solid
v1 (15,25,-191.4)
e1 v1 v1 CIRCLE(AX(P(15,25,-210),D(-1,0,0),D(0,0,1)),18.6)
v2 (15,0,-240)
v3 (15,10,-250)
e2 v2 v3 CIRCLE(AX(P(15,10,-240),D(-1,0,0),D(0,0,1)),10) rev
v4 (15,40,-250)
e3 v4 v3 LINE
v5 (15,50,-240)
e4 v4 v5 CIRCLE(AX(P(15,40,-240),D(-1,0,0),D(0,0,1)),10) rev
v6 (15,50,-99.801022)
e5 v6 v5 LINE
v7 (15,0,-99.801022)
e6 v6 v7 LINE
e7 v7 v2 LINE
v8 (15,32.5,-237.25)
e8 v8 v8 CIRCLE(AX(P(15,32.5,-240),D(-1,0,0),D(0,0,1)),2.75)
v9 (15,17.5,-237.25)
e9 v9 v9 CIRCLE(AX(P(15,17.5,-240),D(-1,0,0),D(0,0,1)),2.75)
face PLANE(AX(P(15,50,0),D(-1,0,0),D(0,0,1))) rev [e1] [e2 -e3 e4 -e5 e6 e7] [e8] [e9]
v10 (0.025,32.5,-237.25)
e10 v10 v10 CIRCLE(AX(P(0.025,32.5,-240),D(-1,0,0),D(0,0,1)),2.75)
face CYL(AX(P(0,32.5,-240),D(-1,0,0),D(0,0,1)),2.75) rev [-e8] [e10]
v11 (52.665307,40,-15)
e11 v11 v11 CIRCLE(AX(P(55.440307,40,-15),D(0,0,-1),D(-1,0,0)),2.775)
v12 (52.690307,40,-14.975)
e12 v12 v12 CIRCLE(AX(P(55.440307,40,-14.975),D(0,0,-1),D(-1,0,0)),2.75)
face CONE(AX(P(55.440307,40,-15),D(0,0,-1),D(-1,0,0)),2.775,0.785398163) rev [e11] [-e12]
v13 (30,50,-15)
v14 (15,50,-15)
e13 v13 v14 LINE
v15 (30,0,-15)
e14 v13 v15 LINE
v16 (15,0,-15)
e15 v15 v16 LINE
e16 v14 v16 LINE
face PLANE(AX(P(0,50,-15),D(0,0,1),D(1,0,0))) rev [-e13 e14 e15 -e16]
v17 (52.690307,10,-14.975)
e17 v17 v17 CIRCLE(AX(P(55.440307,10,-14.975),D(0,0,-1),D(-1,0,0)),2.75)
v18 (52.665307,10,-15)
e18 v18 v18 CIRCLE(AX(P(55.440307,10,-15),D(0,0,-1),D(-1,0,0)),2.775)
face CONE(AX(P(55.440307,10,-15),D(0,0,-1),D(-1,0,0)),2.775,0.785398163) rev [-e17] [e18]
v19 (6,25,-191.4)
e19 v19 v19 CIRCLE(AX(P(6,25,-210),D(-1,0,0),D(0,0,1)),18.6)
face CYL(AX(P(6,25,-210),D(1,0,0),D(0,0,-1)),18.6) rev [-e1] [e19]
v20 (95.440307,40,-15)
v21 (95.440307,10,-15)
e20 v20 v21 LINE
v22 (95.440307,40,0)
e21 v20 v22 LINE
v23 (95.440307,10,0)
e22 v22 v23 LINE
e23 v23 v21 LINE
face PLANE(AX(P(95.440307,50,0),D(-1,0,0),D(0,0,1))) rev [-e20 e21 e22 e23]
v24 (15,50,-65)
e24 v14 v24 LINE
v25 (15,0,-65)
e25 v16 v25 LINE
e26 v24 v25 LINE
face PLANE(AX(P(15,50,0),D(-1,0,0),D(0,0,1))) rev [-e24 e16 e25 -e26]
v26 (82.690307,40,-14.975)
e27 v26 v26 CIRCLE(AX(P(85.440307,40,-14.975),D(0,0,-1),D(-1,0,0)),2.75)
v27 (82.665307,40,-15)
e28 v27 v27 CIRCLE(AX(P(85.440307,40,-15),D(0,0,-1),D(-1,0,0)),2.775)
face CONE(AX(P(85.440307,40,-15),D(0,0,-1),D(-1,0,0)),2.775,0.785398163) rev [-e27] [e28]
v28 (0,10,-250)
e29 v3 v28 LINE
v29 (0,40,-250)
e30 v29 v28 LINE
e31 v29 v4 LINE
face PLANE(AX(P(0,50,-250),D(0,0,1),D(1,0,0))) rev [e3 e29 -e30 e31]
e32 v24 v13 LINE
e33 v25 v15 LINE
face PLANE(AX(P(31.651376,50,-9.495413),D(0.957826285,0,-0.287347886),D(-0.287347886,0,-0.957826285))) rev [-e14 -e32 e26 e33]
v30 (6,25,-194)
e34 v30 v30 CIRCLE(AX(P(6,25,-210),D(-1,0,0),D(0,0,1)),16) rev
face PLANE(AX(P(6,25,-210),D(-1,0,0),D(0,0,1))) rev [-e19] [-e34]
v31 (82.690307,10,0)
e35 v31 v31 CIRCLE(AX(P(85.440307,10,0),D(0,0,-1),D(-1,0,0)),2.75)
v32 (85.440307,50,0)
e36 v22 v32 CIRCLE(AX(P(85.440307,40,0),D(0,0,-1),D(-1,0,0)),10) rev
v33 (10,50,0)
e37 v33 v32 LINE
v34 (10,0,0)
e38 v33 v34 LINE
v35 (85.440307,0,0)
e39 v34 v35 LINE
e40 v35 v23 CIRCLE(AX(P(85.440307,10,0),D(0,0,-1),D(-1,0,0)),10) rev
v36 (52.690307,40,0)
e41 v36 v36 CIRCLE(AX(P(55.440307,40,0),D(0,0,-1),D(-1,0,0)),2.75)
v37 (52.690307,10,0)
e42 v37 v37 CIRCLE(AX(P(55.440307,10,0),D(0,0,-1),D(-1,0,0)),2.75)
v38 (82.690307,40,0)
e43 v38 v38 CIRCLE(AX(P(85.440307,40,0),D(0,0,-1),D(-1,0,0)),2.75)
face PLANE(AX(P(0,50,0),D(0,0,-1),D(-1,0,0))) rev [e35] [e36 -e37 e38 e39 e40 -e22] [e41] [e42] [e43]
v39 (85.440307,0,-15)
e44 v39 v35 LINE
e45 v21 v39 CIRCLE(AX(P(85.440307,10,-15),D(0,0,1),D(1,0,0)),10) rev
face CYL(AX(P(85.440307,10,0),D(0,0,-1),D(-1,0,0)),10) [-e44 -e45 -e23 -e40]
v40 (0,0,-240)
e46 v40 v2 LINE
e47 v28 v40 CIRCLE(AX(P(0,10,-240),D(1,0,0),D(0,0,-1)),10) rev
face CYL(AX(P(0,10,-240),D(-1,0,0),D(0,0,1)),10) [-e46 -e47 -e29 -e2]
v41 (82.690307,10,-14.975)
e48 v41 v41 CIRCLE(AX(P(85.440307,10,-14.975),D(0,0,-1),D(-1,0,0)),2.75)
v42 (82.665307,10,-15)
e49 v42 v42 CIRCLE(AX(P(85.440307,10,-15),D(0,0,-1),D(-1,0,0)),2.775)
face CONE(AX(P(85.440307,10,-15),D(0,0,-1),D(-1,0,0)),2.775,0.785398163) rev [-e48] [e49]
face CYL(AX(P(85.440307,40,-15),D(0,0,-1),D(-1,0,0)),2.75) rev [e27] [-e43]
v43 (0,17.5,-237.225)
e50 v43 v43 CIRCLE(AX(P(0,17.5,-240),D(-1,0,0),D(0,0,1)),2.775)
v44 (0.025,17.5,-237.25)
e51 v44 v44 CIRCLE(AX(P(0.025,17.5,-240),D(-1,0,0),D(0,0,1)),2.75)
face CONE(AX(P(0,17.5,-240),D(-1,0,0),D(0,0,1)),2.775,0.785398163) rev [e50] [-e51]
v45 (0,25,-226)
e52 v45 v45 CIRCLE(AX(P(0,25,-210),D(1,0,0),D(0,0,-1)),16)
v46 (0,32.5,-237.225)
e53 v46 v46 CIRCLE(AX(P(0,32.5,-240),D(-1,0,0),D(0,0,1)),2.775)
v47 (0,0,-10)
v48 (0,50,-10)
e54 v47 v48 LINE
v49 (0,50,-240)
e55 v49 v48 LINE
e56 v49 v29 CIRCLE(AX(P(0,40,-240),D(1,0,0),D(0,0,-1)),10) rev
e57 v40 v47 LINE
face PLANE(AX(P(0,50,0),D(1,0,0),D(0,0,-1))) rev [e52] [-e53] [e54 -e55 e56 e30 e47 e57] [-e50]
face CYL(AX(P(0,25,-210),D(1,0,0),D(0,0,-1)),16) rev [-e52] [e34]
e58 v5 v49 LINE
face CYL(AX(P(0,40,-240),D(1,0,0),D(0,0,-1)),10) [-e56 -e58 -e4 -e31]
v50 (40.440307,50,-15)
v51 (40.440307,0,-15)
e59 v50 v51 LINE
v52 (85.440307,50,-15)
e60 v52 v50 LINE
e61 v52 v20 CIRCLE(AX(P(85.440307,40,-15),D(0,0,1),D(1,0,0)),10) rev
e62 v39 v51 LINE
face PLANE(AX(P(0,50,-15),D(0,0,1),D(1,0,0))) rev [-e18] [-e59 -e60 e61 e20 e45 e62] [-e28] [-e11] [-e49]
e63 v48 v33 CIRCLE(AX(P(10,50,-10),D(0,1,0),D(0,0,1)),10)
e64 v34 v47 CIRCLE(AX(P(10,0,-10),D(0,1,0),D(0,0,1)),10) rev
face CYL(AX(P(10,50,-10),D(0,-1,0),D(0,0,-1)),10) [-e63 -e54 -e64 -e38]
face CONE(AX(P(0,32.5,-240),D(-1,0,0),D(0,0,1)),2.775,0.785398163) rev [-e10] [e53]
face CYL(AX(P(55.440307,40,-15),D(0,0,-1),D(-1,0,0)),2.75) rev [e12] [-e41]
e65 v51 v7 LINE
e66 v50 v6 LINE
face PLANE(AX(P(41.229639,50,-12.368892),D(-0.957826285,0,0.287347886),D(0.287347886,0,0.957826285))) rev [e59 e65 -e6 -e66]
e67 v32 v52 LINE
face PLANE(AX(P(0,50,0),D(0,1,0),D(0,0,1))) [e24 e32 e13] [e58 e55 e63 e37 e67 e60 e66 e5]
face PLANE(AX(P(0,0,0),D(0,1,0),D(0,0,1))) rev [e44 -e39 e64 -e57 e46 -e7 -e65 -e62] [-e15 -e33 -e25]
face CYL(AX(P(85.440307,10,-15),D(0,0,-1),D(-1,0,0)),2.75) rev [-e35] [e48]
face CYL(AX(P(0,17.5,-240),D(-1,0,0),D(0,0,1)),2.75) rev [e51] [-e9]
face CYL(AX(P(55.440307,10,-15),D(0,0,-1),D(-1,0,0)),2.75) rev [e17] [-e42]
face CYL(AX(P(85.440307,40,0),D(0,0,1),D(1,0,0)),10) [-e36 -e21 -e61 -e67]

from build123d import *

# Parameters (mm, degrees)
BOSS_EXTRUDE1_DEPTH            = 50
SKETCH7_R                      = 16
CUT_EXTRUDE2_DEPTH             = 268.339938863
SKETCH8_R                      = 18.6
CUT_EXTRUDE3_DEPTH             = 9
FILLET2_R                      = 10
M5_CLEARANCE_HOLE2_D           = 5.5
M5_CLEARANCE_HOLE2_CSINK_D     = 5.55
M5_CLEARANCE_HOLE2_CSINK_ANGLE = 90
FILLET1_R                      = 10


# Read off the part's stored shape, not the designer's step: M5 Clearance Hole3
with BuildPart() as part:
    # Sketch1 → Boss-Extrude1 (new body)
    with BuildSketch(Plane(origin=(0, 0, 0), x_dir=(1, 0, 0), z_dir=(0, 1, 0))):
        Polygon((15, 15), (15, 250), (0, 250), (0, 0), (95.440306509, 0), (95.440306509, 15), align=None)
        Polygon((40.440306509, 15), (15, 99.801021696), (15, 65), (30, 15), align=None)
    extrude(amount=BOSS_EXTRUDE1_DEPTH)

    # Sketch7 → Cut-Extrude2 (cut, through all)
    with BuildSketch(Plane(origin=(15, 0, 0), x_dir=(0, 0, -1), z_dir=(1, 0, 0))):
        with Locations((210, 25)):
            Circle(SKETCH7_R)
    extrude(amount=-CUT_EXTRUDE2_DEPTH, mode=Mode.SUBTRACT)

    # Sketch8 → Cut-Extrude3 (cut)
    with BuildSketch(Plane.ZY.offset(-15)):
        with Locations((-210, 25)):
            Circle(SKETCH8_R)
    extrude(amount=CUT_EXTRUDE3_DEPTH, mode=Mode.SUBTRACT)

    # Fillet2
    fillet2_edges = [part.edges().sort_by_distance(p)[0] for p in [
        (0, 25, 0),
    ]]
    fillet(fillet2_edges, radius=FILLET2_R)

    # M5 Clearance Hole2 (through all)
    with Locations(Plane.ZY):
        with Locations((-240, 32.5), (-240, 17.5)):
            CounterSinkHole(M5_CLEARANCE_HOLE2_D / 2, M5_CLEARANCE_HOLE2_CSINK_D / 2, counter_sink_angle=M5_CLEARANCE_HOLE2_CSINK_ANGLE)

    # M5 Clearance Hole3 outline → M5 Clearance Hole3 (revolve, cut)
    with BuildSketch(Plane(origin=(55.440306509, 40, 0), x_dir=(1, 0, 0), z_dir=(0, -1, 0))):
        Polygon((2.75, -14.975), (2.75, 0), (0, 0), (0, -15), (2.775, -15), align=None)
    revolve(axis=Axis((55.440306509, 40, 0), (0, 0, 1)), mode=Mode.SUBTRACT)

    # M5 Clearance Hole3 2 outline → M5 Clearance Hole3 2 (revolve, cut)
    with BuildSketch(Plane(origin=(85.440306509, 10, 0), x_dir=(1, 0, 0), z_dir=(0, -1, 0))):
        Polygon((2.75, -14.975), (2.75, 0), (0, 0), (0, -15), (2.775, -15), align=None)
    revolve(axis=Axis((85.440306509, 10, 0), (0, 0, 1)), mode=Mode.SUBTRACT)

    # M5 Clearance Hole3 3 outline → M5 Clearance Hole3 3 (revolve, cut)
    with BuildSketch(Plane(origin=(55.440306509, 10, 0), x_dir=(1, 0, 0), z_dir=(0, -1, 0))):
        Polygon((2.75, -14.975), (2.75, 0), (0, 0), (0, -15), (2.775, -15), align=None)
    revolve(axis=Axis((55.440306509, 10, 0), (0, 0, 1)), mode=Mode.SUBTRACT)

    # M5 Clearance Hole3 4 outline → M5 Clearance Hole3 4 (revolve, cut)
    with BuildSketch(Plane(origin=(85.440306509, 40, 0), x_dir=(1, 0, 0), z_dir=(0, -1, 0))):
        Polygon((2.75, -14.975), (2.75, 0), (0, 0), (0, -15), (2.775, -15), align=None)
    revolve(axis=Axis((85.440306509, 40, 0), (0, 0, 1)), mode=Mode.SUBTRACT)

    # Fillet1
    fillet1_edges = [part.edges().sort_by_distance(p)[0] for p in [
        (95.440306509, 0, -7.5),
        (7.5, 0, -250),
        (7.5, 50, -250),
        (95.440306509, 50, -7.5),
    ]]
    fillet(fillet1_edges, radius=FILLET1_R)


solid = part.part
